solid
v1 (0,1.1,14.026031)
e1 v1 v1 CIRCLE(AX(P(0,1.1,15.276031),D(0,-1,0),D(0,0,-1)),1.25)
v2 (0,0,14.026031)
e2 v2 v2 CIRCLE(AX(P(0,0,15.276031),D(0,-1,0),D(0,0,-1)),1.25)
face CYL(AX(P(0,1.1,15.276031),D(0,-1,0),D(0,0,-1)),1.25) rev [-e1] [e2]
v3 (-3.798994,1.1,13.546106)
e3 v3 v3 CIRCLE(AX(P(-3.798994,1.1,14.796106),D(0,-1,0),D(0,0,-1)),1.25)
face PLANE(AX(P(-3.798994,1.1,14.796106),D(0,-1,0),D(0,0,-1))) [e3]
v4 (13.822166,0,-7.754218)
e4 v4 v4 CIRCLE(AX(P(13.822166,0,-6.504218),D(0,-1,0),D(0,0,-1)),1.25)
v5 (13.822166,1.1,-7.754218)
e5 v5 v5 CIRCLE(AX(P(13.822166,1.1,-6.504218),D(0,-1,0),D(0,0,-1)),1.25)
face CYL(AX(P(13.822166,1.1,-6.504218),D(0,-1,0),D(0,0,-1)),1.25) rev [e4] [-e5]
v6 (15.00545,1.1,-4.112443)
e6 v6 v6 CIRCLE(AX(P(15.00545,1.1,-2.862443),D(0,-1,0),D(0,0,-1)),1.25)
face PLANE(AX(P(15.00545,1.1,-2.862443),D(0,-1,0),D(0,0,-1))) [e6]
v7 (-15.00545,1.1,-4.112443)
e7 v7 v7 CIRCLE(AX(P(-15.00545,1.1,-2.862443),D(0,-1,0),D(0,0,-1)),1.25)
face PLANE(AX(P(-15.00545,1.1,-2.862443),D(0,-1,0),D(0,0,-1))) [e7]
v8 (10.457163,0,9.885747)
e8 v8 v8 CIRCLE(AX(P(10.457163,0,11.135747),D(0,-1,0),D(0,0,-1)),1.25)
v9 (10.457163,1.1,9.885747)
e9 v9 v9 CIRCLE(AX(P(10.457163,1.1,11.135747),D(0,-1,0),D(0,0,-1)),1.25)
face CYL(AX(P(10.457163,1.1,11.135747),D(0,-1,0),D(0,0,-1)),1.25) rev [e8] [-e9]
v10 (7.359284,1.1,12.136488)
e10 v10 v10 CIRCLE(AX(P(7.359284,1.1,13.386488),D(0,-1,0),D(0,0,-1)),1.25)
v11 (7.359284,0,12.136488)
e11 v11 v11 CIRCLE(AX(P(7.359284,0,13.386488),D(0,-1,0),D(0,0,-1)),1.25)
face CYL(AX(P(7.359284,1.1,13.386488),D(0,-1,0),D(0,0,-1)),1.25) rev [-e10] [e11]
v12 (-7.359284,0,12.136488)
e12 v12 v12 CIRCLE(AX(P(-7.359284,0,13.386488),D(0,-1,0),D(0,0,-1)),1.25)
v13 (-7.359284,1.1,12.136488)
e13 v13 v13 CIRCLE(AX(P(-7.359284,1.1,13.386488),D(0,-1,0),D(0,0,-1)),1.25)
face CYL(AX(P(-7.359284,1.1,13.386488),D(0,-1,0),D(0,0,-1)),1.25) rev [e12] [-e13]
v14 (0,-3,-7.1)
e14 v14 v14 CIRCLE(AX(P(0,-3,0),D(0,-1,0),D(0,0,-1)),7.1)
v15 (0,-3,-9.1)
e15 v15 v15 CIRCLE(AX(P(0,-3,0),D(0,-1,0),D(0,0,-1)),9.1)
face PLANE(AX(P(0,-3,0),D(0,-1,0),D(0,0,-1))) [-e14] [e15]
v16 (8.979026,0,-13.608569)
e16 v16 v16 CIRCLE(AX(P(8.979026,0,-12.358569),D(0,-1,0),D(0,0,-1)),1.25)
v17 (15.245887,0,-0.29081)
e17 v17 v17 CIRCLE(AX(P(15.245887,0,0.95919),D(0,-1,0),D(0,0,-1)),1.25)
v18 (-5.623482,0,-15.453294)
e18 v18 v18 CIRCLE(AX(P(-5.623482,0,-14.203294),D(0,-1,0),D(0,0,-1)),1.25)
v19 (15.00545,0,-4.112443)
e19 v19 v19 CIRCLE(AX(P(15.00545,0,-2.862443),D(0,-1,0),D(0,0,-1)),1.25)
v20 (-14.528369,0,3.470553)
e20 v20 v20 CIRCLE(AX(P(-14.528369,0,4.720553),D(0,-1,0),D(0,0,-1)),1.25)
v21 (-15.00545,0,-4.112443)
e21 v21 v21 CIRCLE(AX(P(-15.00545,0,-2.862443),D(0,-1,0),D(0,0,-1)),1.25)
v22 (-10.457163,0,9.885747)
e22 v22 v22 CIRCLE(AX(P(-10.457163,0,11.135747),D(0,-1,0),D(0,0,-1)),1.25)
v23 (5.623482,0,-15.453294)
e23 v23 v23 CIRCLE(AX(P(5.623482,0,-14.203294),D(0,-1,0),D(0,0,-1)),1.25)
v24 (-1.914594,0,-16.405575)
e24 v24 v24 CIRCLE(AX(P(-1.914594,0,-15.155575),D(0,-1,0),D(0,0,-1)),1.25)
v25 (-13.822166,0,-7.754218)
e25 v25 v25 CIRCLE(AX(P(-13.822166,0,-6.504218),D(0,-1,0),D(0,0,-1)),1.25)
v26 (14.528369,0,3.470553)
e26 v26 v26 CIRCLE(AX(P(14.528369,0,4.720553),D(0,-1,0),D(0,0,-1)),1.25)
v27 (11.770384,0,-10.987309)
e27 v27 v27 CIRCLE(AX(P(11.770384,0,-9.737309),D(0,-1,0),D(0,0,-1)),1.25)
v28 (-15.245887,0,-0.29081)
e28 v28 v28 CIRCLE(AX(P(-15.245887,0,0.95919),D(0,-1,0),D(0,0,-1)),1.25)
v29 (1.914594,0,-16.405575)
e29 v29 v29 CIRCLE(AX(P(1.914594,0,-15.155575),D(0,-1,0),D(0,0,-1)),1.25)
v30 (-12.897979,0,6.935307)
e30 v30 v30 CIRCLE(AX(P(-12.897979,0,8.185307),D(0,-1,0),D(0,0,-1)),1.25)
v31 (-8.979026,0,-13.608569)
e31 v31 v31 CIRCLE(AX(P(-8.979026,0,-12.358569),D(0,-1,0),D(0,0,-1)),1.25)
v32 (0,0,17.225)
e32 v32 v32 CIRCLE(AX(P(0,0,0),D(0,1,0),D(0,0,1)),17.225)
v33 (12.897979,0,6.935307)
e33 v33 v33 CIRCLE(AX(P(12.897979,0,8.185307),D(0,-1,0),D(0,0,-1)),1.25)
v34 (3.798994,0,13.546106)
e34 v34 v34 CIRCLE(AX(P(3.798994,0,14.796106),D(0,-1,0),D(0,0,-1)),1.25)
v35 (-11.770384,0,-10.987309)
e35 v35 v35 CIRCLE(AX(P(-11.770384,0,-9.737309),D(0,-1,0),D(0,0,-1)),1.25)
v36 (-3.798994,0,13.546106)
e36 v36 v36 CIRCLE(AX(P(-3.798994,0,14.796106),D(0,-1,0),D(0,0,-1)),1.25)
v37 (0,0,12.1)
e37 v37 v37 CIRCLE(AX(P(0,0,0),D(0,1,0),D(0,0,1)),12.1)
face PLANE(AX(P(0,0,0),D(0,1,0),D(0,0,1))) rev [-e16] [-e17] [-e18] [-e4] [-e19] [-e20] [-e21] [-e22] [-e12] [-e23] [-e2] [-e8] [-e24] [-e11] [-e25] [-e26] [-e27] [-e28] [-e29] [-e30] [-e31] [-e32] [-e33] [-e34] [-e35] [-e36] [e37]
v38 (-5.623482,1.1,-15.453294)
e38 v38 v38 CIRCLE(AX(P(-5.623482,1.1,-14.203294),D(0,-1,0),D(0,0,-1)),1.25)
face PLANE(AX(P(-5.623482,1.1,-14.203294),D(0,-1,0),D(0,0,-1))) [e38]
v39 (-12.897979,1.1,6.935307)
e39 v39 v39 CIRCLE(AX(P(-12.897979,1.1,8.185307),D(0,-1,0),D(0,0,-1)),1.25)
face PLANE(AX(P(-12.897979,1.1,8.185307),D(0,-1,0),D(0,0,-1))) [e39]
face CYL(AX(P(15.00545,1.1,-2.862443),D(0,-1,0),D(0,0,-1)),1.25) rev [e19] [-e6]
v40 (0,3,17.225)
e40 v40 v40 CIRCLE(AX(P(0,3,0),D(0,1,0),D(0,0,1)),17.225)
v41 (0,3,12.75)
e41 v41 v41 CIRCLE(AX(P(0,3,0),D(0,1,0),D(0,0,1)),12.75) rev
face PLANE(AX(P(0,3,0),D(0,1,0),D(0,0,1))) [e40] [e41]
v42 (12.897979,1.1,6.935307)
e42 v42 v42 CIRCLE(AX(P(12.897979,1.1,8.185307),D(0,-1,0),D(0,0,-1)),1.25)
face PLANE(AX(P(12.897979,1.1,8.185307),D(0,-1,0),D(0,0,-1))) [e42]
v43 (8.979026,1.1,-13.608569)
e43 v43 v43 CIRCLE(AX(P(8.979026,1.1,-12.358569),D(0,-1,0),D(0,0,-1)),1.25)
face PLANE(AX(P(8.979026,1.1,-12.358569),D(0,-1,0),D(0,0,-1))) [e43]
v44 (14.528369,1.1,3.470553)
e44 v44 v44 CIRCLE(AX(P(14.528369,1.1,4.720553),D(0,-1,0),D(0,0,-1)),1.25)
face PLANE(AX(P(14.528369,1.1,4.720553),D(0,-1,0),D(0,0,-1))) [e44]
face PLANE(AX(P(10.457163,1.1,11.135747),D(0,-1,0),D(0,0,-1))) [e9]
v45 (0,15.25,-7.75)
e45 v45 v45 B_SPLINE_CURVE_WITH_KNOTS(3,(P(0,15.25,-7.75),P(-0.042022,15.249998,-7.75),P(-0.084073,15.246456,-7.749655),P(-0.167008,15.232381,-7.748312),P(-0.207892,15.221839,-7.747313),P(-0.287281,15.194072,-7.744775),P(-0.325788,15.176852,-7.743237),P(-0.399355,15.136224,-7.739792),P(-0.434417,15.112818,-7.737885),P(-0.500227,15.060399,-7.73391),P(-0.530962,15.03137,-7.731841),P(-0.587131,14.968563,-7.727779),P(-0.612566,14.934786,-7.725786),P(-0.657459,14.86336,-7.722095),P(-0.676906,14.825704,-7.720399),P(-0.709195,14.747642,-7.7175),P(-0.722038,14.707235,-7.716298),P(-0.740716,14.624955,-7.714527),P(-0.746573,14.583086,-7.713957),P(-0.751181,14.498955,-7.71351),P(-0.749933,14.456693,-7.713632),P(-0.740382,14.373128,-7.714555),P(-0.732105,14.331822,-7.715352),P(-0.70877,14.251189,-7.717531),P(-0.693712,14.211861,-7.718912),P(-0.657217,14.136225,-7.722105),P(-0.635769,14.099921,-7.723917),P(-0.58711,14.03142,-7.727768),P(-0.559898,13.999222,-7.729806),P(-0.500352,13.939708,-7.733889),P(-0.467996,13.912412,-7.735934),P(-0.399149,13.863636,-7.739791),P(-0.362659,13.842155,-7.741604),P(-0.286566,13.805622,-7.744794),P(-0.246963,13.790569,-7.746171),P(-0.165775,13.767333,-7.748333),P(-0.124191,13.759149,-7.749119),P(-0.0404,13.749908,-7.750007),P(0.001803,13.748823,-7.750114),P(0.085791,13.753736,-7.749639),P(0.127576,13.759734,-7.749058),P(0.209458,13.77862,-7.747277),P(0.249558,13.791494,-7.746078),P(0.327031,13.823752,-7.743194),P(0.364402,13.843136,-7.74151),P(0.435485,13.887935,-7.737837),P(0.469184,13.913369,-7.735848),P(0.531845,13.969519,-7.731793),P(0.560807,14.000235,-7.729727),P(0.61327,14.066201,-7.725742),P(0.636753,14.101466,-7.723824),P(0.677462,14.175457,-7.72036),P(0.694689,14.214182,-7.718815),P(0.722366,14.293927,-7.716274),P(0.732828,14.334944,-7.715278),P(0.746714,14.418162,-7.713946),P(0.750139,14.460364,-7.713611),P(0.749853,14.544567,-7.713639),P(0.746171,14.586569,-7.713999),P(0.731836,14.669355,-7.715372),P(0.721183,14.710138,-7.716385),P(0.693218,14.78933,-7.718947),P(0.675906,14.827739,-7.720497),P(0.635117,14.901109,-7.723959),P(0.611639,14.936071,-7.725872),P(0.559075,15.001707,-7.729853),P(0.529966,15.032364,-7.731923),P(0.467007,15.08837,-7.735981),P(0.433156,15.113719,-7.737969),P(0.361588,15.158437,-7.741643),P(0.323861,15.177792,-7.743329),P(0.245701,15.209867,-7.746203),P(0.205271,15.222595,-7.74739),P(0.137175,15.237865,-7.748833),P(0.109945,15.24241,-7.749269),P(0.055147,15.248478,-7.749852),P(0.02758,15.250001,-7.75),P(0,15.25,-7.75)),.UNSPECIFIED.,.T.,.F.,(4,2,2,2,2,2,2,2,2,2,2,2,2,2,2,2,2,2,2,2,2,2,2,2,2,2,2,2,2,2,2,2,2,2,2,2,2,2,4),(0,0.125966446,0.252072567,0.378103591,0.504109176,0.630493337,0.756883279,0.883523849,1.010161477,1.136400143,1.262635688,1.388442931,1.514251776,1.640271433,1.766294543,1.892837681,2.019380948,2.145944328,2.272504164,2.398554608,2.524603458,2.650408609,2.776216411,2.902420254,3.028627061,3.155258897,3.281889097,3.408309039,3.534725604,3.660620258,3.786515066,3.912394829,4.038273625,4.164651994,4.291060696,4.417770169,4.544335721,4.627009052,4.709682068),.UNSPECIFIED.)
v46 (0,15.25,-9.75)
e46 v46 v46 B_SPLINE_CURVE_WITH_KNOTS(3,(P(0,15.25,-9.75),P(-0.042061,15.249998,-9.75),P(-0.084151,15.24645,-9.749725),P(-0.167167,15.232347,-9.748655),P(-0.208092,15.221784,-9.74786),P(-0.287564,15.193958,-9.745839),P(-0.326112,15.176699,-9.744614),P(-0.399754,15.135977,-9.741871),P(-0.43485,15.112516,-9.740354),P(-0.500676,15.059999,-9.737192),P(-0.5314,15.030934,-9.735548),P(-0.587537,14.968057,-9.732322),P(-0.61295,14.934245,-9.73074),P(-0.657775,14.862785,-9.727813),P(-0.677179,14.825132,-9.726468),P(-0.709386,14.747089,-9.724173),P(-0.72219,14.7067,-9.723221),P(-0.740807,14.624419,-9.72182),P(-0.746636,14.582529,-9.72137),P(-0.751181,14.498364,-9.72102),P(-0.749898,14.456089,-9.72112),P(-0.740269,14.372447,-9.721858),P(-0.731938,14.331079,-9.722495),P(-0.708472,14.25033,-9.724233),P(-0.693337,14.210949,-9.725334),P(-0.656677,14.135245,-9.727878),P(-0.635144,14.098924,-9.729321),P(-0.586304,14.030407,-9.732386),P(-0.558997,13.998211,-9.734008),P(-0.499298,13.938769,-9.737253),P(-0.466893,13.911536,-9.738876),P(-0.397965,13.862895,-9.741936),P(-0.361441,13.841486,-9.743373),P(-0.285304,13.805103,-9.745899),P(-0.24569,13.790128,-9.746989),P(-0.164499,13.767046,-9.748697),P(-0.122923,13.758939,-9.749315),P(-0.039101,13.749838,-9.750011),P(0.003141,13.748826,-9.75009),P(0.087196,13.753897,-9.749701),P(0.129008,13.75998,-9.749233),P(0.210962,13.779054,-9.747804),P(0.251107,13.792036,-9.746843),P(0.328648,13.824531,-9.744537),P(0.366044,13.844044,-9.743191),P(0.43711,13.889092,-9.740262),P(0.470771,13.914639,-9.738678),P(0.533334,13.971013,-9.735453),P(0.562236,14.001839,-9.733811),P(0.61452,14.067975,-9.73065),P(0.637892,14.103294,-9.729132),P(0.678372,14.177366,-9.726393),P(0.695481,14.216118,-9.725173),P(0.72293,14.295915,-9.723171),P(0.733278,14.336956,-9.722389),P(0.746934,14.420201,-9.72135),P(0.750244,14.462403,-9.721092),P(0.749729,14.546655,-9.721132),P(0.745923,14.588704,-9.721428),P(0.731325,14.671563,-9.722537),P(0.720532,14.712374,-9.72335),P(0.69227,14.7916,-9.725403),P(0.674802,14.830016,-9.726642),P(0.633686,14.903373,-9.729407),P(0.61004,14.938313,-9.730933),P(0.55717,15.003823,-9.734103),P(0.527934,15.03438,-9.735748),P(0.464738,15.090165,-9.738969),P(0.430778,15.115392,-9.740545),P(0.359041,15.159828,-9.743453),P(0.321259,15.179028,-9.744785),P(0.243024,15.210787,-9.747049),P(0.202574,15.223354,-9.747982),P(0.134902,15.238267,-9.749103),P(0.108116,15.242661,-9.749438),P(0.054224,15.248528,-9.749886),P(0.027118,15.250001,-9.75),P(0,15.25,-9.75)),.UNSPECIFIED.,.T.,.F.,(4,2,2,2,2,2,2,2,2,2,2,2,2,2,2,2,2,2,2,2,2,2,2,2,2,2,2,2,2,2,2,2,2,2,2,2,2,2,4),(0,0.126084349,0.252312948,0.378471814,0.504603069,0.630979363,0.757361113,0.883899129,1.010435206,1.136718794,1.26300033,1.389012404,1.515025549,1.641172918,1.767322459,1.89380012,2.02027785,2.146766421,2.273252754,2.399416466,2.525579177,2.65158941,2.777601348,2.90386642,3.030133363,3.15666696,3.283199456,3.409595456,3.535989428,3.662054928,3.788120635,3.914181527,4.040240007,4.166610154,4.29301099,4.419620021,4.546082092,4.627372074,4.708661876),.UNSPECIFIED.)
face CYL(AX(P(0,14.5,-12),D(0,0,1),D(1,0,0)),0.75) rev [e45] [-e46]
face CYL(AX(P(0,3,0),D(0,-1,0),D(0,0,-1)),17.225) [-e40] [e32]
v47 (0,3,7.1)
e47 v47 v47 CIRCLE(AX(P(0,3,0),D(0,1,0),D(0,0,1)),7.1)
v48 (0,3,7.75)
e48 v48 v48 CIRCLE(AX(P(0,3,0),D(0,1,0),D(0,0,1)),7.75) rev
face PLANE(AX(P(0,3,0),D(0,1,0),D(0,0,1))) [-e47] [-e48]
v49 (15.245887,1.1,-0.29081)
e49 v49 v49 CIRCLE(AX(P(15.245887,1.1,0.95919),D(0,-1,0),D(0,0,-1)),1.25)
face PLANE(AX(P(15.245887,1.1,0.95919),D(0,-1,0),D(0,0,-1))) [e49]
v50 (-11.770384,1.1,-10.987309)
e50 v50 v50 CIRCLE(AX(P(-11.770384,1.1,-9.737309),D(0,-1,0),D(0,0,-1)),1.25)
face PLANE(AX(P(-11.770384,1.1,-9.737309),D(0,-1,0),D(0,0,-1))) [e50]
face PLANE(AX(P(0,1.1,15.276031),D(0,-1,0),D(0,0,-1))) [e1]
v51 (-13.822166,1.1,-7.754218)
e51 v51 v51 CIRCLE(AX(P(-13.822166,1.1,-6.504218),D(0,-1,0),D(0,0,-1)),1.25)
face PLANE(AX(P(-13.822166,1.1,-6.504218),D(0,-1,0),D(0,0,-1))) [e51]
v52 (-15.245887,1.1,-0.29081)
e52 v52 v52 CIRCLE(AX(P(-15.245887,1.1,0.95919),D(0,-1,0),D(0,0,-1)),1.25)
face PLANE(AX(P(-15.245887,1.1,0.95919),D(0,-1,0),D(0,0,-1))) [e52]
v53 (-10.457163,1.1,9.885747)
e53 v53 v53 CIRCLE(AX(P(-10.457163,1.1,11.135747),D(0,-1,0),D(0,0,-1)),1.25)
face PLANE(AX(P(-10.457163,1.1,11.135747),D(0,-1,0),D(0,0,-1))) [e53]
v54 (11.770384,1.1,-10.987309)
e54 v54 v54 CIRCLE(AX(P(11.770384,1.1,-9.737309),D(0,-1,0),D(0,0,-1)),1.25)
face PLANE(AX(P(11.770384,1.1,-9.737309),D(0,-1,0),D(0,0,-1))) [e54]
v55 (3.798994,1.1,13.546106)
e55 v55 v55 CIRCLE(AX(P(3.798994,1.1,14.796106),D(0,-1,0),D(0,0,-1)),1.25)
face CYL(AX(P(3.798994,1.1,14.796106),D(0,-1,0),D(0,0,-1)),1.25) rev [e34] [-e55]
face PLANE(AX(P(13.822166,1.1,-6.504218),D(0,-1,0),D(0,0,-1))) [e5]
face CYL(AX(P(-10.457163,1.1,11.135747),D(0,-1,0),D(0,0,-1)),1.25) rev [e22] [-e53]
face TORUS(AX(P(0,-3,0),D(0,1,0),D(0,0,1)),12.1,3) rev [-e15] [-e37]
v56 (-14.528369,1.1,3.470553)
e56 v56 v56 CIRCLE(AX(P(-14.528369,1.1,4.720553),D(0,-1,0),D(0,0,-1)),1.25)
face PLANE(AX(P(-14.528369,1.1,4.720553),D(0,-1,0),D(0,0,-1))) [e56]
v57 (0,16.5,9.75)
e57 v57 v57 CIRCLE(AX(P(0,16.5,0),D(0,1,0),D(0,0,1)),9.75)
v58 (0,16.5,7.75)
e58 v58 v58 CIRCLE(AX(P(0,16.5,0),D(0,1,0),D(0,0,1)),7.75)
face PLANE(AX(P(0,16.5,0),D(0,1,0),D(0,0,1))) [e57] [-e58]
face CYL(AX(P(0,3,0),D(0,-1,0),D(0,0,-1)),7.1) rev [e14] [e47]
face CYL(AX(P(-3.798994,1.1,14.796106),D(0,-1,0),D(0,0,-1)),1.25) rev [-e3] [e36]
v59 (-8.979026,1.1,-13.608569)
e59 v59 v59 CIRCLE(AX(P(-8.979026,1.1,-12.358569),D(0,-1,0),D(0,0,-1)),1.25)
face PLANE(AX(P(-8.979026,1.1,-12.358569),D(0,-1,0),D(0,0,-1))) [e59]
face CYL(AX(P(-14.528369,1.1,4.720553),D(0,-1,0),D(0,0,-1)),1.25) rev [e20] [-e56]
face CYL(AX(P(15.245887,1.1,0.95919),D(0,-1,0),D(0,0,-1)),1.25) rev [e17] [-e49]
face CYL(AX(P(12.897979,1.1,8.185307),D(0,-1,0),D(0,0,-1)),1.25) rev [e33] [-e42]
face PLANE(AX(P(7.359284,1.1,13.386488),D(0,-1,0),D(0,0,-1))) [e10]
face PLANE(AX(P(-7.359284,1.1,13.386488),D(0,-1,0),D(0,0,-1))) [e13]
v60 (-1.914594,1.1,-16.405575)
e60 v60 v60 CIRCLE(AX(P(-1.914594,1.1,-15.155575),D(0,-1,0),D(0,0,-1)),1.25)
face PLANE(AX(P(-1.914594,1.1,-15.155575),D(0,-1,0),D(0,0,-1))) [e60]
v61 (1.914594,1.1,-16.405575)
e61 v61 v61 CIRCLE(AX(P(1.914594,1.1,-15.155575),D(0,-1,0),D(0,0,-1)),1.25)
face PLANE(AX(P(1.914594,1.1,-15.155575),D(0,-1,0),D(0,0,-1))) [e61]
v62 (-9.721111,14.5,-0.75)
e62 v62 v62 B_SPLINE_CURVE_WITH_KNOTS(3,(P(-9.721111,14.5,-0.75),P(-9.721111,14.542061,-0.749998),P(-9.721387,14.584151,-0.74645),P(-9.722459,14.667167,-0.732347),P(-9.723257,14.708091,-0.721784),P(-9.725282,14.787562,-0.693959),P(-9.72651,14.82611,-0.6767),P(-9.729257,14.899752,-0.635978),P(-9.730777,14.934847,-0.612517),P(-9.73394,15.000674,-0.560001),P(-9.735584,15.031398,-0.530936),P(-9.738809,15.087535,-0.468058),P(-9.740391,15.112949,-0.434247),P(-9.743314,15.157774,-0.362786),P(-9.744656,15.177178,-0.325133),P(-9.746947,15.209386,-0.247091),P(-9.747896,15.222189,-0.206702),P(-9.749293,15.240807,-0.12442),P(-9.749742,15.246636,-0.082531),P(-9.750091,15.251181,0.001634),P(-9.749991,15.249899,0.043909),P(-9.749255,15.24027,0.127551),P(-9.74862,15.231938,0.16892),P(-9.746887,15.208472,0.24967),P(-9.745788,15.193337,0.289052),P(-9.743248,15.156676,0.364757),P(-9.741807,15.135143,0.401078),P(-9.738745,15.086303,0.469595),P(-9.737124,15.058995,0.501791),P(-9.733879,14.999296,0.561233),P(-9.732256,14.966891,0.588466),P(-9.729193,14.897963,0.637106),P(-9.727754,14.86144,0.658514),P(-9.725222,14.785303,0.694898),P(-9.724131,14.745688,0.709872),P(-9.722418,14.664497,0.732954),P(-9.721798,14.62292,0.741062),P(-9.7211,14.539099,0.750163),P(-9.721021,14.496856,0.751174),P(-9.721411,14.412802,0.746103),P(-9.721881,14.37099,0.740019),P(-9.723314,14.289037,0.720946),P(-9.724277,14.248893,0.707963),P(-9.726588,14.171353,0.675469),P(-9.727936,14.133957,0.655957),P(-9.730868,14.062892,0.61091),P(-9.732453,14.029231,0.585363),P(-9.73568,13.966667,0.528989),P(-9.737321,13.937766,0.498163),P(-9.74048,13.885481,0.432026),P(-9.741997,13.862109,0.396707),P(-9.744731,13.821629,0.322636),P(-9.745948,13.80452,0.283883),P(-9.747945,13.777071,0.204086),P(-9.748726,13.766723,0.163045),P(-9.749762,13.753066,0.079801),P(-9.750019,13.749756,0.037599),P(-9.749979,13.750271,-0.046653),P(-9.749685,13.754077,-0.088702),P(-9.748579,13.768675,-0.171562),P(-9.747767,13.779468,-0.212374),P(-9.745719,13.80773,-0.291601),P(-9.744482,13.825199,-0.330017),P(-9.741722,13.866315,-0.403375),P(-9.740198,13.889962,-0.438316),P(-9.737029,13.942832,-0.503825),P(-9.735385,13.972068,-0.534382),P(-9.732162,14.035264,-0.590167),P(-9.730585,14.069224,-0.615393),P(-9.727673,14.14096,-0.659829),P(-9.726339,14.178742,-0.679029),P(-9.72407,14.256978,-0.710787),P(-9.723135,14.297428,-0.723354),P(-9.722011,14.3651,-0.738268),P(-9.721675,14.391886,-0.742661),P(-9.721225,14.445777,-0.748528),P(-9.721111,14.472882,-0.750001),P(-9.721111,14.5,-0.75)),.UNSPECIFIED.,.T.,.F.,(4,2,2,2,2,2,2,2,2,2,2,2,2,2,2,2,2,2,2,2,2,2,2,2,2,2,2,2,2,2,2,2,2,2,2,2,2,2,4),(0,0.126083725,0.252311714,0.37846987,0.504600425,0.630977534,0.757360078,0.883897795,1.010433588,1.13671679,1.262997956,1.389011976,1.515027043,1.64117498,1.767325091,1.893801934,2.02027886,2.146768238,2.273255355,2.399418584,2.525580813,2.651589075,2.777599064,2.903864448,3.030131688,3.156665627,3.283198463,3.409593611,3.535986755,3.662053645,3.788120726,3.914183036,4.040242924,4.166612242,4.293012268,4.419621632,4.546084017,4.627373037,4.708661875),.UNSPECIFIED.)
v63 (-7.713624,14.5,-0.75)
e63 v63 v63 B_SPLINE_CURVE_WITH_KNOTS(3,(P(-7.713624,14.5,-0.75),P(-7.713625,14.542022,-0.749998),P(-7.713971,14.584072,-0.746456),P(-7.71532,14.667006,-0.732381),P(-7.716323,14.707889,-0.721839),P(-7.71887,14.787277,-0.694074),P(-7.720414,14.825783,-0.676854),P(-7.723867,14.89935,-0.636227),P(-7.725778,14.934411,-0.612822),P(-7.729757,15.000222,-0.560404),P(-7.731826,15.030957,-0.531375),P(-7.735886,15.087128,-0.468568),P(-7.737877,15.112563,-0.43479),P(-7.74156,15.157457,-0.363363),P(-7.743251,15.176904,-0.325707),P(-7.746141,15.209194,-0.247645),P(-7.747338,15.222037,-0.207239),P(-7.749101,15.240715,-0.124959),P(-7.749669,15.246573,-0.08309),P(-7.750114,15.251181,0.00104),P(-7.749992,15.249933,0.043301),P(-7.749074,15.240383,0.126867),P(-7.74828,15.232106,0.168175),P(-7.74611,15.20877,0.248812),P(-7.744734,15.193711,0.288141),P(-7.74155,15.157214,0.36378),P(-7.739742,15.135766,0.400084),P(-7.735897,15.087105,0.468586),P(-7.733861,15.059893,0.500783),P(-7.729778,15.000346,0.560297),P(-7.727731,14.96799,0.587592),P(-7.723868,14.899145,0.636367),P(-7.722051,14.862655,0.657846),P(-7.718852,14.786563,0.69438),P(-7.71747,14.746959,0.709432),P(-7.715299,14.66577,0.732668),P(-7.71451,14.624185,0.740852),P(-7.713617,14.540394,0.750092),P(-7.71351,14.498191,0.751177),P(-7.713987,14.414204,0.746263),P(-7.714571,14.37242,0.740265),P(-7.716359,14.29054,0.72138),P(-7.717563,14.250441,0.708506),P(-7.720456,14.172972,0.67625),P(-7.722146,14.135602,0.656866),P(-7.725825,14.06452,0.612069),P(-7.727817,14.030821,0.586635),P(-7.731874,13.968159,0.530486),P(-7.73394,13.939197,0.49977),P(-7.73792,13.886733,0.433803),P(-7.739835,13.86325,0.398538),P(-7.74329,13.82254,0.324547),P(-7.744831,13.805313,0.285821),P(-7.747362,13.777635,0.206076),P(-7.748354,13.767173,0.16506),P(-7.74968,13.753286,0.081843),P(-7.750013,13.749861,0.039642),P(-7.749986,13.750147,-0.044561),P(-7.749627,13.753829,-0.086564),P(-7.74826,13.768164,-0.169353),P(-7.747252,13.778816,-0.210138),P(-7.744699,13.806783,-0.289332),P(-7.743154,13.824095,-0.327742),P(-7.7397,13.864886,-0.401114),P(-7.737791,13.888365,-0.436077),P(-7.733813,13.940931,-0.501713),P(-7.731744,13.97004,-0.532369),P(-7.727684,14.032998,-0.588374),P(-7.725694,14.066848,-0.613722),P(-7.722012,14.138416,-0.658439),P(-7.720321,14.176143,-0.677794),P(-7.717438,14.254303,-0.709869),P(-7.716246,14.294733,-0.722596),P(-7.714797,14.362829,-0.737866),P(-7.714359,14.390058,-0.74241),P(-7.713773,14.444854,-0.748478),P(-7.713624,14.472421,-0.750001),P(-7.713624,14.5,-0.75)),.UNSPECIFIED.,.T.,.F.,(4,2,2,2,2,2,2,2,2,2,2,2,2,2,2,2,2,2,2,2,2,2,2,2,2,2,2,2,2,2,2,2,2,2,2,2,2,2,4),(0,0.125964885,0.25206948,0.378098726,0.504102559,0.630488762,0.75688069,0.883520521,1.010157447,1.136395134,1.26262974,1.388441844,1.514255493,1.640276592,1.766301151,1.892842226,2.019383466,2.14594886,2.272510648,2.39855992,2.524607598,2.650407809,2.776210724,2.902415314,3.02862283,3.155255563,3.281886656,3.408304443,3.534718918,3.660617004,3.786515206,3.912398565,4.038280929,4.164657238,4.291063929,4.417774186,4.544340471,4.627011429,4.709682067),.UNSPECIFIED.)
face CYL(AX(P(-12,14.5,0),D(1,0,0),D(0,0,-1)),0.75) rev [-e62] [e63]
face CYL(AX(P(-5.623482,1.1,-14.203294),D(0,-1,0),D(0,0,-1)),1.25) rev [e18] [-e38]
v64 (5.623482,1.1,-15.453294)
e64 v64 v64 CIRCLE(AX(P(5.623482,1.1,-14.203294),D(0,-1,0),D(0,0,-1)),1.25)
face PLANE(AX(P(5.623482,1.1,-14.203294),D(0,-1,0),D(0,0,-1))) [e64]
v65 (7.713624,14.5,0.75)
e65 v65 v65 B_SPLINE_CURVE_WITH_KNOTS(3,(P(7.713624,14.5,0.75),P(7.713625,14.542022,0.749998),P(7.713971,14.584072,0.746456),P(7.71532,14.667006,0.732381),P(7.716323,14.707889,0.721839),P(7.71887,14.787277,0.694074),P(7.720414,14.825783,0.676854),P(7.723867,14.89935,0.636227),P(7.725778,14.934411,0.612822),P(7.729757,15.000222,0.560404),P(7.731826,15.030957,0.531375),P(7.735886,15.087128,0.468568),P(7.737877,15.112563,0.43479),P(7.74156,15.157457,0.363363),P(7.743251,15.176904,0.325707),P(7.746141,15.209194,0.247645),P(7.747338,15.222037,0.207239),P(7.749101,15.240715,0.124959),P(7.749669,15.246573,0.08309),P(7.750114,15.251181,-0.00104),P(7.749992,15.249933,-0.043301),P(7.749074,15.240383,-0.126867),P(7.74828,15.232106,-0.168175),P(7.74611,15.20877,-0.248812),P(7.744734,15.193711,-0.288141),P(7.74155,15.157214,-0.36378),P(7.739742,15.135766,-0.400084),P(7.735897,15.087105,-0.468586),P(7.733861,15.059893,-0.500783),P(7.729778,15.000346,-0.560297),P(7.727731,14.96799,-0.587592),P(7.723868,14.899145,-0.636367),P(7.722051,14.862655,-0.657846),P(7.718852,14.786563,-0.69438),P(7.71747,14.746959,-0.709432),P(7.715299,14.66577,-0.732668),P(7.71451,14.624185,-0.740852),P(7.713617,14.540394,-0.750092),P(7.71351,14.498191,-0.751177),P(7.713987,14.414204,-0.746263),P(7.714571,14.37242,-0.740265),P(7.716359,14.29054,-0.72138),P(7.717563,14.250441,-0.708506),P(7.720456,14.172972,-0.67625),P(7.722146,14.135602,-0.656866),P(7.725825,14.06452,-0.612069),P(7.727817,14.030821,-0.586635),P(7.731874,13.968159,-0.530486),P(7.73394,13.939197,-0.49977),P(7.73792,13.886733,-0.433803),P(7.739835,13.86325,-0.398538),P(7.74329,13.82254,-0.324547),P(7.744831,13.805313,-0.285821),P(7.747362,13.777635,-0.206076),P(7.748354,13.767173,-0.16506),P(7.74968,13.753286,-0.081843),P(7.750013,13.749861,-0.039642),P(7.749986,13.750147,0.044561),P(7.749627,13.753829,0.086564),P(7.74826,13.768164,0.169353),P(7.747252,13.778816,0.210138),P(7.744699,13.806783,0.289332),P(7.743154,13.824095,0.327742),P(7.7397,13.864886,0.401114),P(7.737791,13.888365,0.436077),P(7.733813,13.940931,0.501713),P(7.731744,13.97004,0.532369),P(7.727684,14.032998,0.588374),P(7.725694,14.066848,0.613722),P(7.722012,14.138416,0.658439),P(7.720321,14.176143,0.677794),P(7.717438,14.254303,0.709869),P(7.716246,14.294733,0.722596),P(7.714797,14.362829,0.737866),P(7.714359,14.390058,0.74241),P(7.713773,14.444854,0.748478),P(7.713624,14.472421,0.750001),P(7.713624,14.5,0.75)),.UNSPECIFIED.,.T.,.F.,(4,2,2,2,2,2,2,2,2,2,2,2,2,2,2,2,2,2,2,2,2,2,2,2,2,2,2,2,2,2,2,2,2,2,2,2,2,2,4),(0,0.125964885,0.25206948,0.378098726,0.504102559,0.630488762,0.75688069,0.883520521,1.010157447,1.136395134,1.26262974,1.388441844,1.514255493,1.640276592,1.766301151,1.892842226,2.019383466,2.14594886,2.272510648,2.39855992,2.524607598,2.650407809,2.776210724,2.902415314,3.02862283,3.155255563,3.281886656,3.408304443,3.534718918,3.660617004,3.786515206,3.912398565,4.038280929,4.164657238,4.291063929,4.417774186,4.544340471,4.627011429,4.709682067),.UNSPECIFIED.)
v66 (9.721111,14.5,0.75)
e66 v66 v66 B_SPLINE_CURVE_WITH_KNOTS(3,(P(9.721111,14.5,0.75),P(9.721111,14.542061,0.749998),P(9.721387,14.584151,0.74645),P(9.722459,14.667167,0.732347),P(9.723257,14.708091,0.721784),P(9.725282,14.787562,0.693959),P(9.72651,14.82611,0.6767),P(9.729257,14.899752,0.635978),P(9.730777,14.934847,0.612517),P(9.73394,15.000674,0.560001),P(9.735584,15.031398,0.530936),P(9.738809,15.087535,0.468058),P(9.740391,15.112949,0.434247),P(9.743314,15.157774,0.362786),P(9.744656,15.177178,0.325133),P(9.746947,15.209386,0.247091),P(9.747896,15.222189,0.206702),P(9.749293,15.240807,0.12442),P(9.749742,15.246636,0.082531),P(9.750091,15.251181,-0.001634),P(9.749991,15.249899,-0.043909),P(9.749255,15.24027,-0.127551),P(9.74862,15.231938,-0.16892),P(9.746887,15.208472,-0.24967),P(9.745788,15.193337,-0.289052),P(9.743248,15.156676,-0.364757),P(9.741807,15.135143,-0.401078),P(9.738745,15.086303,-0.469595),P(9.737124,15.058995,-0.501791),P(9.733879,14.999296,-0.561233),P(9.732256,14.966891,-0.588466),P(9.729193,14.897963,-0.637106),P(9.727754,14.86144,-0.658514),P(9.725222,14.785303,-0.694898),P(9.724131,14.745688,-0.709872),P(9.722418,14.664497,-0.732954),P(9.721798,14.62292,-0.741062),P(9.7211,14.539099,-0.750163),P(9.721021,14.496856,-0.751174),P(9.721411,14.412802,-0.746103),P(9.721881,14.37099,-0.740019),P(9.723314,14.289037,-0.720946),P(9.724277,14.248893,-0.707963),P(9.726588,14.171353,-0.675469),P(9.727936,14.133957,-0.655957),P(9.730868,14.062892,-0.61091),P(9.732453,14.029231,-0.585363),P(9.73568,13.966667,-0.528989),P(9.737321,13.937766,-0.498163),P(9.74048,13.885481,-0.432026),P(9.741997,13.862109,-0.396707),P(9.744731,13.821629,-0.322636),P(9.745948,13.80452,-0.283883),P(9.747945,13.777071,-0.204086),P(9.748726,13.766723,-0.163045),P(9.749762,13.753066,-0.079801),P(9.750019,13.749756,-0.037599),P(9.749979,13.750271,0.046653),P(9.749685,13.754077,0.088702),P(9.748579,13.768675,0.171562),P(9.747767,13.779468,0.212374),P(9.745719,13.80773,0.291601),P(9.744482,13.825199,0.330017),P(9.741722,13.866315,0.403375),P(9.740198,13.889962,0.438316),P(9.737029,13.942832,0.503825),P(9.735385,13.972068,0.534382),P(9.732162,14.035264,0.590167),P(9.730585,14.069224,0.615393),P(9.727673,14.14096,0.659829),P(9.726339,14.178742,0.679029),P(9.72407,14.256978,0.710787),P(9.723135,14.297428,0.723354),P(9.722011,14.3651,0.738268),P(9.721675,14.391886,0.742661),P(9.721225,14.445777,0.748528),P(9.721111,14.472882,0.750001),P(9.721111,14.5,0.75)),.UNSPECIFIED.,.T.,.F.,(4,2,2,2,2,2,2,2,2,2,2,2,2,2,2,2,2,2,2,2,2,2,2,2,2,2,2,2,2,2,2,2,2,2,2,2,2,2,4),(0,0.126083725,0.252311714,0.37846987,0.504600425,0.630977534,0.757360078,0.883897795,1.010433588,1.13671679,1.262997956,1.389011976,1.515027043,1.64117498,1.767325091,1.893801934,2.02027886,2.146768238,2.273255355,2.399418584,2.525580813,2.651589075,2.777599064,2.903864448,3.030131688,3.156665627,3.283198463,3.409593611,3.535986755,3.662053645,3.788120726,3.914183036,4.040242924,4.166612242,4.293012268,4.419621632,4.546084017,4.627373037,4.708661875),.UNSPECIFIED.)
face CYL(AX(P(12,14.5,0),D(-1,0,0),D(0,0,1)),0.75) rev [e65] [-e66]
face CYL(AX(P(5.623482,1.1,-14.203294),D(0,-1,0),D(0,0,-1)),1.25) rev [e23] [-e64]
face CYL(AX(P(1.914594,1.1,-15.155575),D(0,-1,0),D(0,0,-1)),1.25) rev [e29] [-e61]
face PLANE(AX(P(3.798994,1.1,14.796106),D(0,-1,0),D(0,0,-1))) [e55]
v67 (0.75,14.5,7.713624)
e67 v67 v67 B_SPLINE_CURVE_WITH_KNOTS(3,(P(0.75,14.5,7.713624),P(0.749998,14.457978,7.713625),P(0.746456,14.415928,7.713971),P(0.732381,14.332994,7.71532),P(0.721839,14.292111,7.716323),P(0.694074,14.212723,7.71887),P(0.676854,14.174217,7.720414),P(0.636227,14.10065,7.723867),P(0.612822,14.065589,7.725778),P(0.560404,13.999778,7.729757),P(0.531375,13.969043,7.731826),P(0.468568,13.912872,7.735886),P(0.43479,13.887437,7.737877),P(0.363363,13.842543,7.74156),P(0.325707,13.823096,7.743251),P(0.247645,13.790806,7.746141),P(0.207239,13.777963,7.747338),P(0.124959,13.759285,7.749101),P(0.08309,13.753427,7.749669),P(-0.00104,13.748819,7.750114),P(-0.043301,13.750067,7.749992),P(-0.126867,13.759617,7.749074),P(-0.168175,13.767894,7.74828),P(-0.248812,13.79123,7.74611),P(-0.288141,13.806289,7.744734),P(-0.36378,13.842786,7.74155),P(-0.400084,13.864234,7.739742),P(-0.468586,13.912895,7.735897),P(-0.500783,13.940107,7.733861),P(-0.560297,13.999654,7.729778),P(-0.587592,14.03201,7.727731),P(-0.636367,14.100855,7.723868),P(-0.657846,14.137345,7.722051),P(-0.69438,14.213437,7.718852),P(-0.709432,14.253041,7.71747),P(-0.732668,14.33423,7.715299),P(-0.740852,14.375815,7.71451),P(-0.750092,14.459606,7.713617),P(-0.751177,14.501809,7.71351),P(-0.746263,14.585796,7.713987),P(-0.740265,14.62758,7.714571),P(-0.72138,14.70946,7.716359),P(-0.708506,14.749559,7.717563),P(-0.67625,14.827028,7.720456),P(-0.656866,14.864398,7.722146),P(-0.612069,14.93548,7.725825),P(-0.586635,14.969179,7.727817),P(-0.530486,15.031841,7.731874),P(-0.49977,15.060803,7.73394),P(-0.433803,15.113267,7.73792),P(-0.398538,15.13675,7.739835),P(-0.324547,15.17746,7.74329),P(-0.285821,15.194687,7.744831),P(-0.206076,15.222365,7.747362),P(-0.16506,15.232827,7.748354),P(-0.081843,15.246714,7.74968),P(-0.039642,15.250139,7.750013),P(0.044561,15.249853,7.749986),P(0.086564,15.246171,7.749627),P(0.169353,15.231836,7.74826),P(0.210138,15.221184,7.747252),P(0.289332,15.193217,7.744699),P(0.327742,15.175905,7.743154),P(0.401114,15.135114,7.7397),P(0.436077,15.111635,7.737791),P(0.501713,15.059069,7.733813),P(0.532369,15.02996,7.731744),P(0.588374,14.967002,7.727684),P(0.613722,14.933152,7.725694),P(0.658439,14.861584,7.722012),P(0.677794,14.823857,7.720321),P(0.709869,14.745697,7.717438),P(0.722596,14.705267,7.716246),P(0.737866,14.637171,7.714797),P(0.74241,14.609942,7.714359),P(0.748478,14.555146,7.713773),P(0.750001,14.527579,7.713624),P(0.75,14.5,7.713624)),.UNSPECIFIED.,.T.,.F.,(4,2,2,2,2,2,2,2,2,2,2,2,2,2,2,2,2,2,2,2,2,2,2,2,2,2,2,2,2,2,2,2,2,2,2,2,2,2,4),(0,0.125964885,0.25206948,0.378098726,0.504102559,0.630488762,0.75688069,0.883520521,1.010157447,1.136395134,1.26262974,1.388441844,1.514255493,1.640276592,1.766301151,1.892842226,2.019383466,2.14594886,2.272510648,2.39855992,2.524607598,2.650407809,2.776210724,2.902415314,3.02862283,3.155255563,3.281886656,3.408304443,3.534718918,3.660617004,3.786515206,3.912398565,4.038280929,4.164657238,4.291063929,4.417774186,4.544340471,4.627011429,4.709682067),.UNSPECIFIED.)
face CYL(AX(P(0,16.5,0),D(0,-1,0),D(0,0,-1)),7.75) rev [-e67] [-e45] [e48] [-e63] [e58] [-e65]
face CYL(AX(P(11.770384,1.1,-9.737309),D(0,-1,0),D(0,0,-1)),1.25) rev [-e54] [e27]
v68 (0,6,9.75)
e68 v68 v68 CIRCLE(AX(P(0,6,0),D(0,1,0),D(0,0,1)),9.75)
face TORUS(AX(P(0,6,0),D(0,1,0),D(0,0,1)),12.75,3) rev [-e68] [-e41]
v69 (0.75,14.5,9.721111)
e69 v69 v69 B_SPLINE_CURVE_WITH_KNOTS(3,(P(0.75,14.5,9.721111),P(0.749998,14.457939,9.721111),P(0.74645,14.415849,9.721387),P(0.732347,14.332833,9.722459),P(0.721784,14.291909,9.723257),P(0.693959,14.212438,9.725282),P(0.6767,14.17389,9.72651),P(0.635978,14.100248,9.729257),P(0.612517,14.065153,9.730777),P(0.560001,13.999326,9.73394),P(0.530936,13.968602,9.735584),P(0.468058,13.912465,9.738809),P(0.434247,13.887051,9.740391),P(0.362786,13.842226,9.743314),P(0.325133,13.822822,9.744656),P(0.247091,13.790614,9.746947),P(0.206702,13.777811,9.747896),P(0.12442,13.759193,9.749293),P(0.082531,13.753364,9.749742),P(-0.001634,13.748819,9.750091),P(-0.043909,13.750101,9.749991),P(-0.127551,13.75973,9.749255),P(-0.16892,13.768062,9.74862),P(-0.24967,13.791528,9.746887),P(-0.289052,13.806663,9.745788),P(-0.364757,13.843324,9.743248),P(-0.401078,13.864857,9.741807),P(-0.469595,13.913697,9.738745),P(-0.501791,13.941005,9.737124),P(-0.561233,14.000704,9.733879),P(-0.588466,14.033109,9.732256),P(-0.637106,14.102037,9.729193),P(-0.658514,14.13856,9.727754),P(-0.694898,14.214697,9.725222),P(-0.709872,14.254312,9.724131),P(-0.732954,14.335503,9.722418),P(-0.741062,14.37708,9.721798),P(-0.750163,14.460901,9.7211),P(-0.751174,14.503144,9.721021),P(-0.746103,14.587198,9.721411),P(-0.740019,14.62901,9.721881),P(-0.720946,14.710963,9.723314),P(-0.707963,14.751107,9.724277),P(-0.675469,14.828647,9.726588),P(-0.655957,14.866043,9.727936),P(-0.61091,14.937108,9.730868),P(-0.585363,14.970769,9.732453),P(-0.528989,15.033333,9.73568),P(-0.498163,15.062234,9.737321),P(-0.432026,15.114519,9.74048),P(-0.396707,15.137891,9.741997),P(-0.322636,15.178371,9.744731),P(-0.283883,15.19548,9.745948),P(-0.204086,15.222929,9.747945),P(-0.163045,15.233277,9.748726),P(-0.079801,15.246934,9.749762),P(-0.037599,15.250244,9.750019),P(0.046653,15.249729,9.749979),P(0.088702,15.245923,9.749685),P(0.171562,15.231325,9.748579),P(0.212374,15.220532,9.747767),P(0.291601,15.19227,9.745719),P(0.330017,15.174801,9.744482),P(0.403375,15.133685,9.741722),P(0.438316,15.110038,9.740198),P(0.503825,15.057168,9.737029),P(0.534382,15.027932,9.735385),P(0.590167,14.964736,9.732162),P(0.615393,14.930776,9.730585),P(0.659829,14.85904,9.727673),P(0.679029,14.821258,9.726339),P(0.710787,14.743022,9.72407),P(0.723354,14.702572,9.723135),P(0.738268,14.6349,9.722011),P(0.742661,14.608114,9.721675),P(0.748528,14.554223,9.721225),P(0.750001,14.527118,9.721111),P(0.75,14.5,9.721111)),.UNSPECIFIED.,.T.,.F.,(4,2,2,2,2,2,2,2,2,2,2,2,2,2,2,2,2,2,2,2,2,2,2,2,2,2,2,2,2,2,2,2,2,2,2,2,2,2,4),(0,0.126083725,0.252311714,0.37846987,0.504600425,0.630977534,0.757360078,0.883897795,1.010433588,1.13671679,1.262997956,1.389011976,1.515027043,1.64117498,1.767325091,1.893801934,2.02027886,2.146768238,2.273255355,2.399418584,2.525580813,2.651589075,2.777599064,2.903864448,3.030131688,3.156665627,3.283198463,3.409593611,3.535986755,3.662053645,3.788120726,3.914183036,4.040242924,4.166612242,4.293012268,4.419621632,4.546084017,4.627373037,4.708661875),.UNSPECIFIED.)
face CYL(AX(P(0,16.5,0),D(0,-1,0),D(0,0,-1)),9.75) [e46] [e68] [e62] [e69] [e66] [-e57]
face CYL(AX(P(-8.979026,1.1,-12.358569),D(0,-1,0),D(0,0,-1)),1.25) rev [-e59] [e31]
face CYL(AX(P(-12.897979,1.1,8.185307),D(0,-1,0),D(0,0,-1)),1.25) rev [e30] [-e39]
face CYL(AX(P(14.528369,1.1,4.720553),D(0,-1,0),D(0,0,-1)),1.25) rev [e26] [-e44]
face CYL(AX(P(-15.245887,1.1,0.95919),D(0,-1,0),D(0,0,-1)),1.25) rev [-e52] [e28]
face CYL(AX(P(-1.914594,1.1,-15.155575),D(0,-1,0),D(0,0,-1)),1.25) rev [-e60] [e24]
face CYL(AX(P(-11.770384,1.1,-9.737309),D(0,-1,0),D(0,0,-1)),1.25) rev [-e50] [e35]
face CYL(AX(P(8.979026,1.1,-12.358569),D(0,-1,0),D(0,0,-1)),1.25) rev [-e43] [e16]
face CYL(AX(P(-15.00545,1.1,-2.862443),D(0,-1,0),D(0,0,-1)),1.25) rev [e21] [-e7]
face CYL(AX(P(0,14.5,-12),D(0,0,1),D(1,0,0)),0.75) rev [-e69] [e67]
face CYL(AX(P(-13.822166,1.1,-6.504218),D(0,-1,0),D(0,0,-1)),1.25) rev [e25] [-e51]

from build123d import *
from build123d.topology import SkipClean

# Parameters (mm, degrees)
CROQUIS1_R              = 17.225
CROQUIS1_R_2            = 7.1
SALIENTE_EXTRUIR1_DEPTH = 3
SALIENTE_EXTRUIR2_START = 3
CROQUIS5_R              = 9.1
CROQUIS5_R_2            = 7.1
SALIENTE_EXTRUIR2_DEPTH = 3
REDONDEO1_R             = 3
CROQUIS10_R             = 1.25
CORTAR_EXTRUIR1_DEPTH   = 1.1
CROQUIS12_R             = 9.75
CROQUIS12_R_2           = 7.75
SALIENTE_EXTRUIR3_DEPTH = 13.5
CROQUIS14_R             = 0.75
CORTAR_EXTRUIR3_DEPTH   = 12
MATRIZC1_COUNT          = 4
REDONDEO2_R             = 3


with BuildPart() as part:
    # Croquis1 → Saliente-Extruir1 (new body)
    with BuildSketch(Plane(origin=(0, 0, 0), x_dir=(1, 0, 0), z_dir=(0, 1, 0))):
        with Locations(Location((0, 0, 0), (0, 0, 270))):
            Circle(CROQUIS1_R)
        with Locations(Location((0, 0, 0), (0, 0, 270))):
            Circle(CROQUIS1_R_2, mode=Mode.SUBTRACT)
    extrude(amount=SALIENTE_EXTRUIR1_DEPTH)

    # Croquis5 → Saliente-Extruir2 (add)
    with SkipClean():  # the faces are left unmerged after this step: merging them gives an invalid solid
        with BuildSketch(Plane.XZ.offset(SALIENTE_EXTRUIR2_START)):
            with Locations(Location((0, 0, 0), (0, 0, 90))):
                Circle(CROQUIS5_R)
            with Locations(Location((0, 0, 0), (0, 0, 270))):
                Circle(CROQUIS5_R_2, mode=Mode.SUBTRACT)
        extrude(amount=-SALIENTE_EXTRUIR2_DEPTH)

    # Redondeo1
    redondeo1_edges = [part.edges().sort_by_distance(p)[0] for p in [
        (0, 0, -9.1),
    ]]
    fillet(redondeo1_edges, radius=REDONDEO1_R - 0.0001)  # a hair under: the kernel refuses the full size

    # Croquis10 → Cortar-Extruir1 (cut)
    with BuildSketch(Plane.XZ):
        with Locations(Location((0, 15.276030829, 0), (0, 0, 270))):
            Circle(CROQUIS10_R)
        with Locations(Location((3.798994383, 14.79610623, 0), (0, 0, 270))):
            Circle(CROQUIS10_R)
        with Locations(Location((7.359283978, 13.38648786, 0), (0, 0, 270))):
            Circle(CROQUIS10_R)
        with Locations(Location((10.457162694, 11.135747226, 0), (0, 0, 270))):
            Circle(CROQUIS10_R)
        with Locations(Location((12.89797942, 8.185306639, 0), (0, 0, 270))):
            Circle(CROQUIS10_R)
        with Locations(Location((14.528368663, 4.720553133, 0), (0, 0, 270))):
            Circle(CROQUIS10_R)
        with Locations(Location((15.245887072, 0.959189912, 0), (0, 0, 270))):
            Circle(CROQUIS10_R)
        with Locations(Location((15.005450325, -2.862442738, 0), (0, 0, 270))):
            Circle(CROQUIS10_R)
        with Locations(Location((13.822165949, -6.504217584, 0), (0, 0, 270))):
            Circle(CROQUIS10_R)
        with Locations(Location((11.770384051, -9.737308519, 0), (0, 0, 270))):
            Circle(CROQUIS10_R)
        with Locations(Location((8.979025635, -12.358568548, 0), (0, 0, 270))):
            Circle(CROQUIS10_R)
        with Locations(Location((5.623482016, -14.203294263, 0), (0, 0, 270))):
            Circle(CROQUIS10_R)
        with Locations(Location((1.91459434, -15.155574764, 0), (0, 0, 270))):
            Circle(CROQUIS10_R)
        with Locations(Location((-1.91459434, -15.155574764, 0), (0, 0, 270))):
            Circle(CROQUIS10_R)
        with Locations(Location((-5.623482016, -14.203294263, 0), (0, 0, 270))):
            Circle(CROQUIS10_R)
        with Locations(Location((-8.979025635, -12.358568548, 0), (0, 0, 270))):
            Circle(CROQUIS10_R)
        with Locations(Location((-11.770384051, -9.737308519, 0), (0, 0, 270))):
            Circle(CROQUIS10_R)
        with Locations(Location((-13.822165949, -6.504217584, 0), (0, 0, 270))):
            Circle(CROQUIS10_R)
        with Locations(Location((-15.005450325, -2.862442738, 0), (0, 0, 270))):
            Circle(CROQUIS10_R)
        with Locations(Location((-15.245887072, 0.959189912, 0), (0, 0, 270))):
            Circle(CROQUIS10_R)
        with Locations(Location((-14.528368663, 4.720553133, 0), (0, 0, 270))):
            Circle(CROQUIS10_R)
        with Locations(Location((-12.89797942, 8.185306639, 0), (0, 0, 270))):
            Circle(CROQUIS10_R)
        with Locations(Location((-10.457162694, 11.135747226, 0), (0, 0, 270))):
            Circle(CROQUIS10_R)
        with Locations(Location((-7.359283978, 13.38648786, 0), (0, 0, 270))):
            Circle(CROQUIS10_R)
        with Locations(Location((-3.798994383, 14.79610623, 0), (0, 0, 270))):
            Circle(CROQUIS10_R)
    extrude(amount=-CORTAR_EXTRUIR1_DEPTH, mode=Mode.SUBTRACT)

    # Croquis12 → Saliente-Extruir3 (add)
    with BuildSketch(Plane(origin=(0, 3, 0), x_dir=(1, 0, 0), z_dir=(0, 1, 0))):
        with Locations(Location((0, 0, 0), (0, 0, 270))):
            Circle(CROQUIS12_R)
        with Locations(Location((0, 0, 0), (0, 0, 270))):
            Circle(CROQUIS12_R_2, mode=Mode.SUBTRACT)
    extrude(amount=SALIENTE_EXTRUIR3_DEPTH)

    # Croquis14 → Cortar-Extruir3 (cut)
    with BuildSketch(Plane(origin=(0, 0, 0), x_dir=(0, 0, -1), z_dir=(1, 0, 0))):
        with Locations((0, 14.5)):
            Circle(CROQUIS14_R)
    cortar_extruir3 = extrude(amount=-CORTAR_EXTRUIR3_DEPTH, mode=Mode.SUBTRACT)

    # MatrizC1: Cortar-Extruir3 ×4 about axis
    matrizc1_axis = Axis((0, 16.5, 0), (0, -1, 0))
    for i in range(1, MATRIZC1_COUNT):
        add(cortar_extruir3.rotate(matrizc1_axis, i * 360 / MATRIZC1_COUNT), mode=Mode.SUBTRACT)

    # Redondeo2
    redondeo2_edges = [part.edges().sort_by_distance(p)[0] for p in [
        (0, 3, -9.75),
    ]]
    fillet(redondeo2_edges, radius=REDONDEO2_R)


solid = part.part
